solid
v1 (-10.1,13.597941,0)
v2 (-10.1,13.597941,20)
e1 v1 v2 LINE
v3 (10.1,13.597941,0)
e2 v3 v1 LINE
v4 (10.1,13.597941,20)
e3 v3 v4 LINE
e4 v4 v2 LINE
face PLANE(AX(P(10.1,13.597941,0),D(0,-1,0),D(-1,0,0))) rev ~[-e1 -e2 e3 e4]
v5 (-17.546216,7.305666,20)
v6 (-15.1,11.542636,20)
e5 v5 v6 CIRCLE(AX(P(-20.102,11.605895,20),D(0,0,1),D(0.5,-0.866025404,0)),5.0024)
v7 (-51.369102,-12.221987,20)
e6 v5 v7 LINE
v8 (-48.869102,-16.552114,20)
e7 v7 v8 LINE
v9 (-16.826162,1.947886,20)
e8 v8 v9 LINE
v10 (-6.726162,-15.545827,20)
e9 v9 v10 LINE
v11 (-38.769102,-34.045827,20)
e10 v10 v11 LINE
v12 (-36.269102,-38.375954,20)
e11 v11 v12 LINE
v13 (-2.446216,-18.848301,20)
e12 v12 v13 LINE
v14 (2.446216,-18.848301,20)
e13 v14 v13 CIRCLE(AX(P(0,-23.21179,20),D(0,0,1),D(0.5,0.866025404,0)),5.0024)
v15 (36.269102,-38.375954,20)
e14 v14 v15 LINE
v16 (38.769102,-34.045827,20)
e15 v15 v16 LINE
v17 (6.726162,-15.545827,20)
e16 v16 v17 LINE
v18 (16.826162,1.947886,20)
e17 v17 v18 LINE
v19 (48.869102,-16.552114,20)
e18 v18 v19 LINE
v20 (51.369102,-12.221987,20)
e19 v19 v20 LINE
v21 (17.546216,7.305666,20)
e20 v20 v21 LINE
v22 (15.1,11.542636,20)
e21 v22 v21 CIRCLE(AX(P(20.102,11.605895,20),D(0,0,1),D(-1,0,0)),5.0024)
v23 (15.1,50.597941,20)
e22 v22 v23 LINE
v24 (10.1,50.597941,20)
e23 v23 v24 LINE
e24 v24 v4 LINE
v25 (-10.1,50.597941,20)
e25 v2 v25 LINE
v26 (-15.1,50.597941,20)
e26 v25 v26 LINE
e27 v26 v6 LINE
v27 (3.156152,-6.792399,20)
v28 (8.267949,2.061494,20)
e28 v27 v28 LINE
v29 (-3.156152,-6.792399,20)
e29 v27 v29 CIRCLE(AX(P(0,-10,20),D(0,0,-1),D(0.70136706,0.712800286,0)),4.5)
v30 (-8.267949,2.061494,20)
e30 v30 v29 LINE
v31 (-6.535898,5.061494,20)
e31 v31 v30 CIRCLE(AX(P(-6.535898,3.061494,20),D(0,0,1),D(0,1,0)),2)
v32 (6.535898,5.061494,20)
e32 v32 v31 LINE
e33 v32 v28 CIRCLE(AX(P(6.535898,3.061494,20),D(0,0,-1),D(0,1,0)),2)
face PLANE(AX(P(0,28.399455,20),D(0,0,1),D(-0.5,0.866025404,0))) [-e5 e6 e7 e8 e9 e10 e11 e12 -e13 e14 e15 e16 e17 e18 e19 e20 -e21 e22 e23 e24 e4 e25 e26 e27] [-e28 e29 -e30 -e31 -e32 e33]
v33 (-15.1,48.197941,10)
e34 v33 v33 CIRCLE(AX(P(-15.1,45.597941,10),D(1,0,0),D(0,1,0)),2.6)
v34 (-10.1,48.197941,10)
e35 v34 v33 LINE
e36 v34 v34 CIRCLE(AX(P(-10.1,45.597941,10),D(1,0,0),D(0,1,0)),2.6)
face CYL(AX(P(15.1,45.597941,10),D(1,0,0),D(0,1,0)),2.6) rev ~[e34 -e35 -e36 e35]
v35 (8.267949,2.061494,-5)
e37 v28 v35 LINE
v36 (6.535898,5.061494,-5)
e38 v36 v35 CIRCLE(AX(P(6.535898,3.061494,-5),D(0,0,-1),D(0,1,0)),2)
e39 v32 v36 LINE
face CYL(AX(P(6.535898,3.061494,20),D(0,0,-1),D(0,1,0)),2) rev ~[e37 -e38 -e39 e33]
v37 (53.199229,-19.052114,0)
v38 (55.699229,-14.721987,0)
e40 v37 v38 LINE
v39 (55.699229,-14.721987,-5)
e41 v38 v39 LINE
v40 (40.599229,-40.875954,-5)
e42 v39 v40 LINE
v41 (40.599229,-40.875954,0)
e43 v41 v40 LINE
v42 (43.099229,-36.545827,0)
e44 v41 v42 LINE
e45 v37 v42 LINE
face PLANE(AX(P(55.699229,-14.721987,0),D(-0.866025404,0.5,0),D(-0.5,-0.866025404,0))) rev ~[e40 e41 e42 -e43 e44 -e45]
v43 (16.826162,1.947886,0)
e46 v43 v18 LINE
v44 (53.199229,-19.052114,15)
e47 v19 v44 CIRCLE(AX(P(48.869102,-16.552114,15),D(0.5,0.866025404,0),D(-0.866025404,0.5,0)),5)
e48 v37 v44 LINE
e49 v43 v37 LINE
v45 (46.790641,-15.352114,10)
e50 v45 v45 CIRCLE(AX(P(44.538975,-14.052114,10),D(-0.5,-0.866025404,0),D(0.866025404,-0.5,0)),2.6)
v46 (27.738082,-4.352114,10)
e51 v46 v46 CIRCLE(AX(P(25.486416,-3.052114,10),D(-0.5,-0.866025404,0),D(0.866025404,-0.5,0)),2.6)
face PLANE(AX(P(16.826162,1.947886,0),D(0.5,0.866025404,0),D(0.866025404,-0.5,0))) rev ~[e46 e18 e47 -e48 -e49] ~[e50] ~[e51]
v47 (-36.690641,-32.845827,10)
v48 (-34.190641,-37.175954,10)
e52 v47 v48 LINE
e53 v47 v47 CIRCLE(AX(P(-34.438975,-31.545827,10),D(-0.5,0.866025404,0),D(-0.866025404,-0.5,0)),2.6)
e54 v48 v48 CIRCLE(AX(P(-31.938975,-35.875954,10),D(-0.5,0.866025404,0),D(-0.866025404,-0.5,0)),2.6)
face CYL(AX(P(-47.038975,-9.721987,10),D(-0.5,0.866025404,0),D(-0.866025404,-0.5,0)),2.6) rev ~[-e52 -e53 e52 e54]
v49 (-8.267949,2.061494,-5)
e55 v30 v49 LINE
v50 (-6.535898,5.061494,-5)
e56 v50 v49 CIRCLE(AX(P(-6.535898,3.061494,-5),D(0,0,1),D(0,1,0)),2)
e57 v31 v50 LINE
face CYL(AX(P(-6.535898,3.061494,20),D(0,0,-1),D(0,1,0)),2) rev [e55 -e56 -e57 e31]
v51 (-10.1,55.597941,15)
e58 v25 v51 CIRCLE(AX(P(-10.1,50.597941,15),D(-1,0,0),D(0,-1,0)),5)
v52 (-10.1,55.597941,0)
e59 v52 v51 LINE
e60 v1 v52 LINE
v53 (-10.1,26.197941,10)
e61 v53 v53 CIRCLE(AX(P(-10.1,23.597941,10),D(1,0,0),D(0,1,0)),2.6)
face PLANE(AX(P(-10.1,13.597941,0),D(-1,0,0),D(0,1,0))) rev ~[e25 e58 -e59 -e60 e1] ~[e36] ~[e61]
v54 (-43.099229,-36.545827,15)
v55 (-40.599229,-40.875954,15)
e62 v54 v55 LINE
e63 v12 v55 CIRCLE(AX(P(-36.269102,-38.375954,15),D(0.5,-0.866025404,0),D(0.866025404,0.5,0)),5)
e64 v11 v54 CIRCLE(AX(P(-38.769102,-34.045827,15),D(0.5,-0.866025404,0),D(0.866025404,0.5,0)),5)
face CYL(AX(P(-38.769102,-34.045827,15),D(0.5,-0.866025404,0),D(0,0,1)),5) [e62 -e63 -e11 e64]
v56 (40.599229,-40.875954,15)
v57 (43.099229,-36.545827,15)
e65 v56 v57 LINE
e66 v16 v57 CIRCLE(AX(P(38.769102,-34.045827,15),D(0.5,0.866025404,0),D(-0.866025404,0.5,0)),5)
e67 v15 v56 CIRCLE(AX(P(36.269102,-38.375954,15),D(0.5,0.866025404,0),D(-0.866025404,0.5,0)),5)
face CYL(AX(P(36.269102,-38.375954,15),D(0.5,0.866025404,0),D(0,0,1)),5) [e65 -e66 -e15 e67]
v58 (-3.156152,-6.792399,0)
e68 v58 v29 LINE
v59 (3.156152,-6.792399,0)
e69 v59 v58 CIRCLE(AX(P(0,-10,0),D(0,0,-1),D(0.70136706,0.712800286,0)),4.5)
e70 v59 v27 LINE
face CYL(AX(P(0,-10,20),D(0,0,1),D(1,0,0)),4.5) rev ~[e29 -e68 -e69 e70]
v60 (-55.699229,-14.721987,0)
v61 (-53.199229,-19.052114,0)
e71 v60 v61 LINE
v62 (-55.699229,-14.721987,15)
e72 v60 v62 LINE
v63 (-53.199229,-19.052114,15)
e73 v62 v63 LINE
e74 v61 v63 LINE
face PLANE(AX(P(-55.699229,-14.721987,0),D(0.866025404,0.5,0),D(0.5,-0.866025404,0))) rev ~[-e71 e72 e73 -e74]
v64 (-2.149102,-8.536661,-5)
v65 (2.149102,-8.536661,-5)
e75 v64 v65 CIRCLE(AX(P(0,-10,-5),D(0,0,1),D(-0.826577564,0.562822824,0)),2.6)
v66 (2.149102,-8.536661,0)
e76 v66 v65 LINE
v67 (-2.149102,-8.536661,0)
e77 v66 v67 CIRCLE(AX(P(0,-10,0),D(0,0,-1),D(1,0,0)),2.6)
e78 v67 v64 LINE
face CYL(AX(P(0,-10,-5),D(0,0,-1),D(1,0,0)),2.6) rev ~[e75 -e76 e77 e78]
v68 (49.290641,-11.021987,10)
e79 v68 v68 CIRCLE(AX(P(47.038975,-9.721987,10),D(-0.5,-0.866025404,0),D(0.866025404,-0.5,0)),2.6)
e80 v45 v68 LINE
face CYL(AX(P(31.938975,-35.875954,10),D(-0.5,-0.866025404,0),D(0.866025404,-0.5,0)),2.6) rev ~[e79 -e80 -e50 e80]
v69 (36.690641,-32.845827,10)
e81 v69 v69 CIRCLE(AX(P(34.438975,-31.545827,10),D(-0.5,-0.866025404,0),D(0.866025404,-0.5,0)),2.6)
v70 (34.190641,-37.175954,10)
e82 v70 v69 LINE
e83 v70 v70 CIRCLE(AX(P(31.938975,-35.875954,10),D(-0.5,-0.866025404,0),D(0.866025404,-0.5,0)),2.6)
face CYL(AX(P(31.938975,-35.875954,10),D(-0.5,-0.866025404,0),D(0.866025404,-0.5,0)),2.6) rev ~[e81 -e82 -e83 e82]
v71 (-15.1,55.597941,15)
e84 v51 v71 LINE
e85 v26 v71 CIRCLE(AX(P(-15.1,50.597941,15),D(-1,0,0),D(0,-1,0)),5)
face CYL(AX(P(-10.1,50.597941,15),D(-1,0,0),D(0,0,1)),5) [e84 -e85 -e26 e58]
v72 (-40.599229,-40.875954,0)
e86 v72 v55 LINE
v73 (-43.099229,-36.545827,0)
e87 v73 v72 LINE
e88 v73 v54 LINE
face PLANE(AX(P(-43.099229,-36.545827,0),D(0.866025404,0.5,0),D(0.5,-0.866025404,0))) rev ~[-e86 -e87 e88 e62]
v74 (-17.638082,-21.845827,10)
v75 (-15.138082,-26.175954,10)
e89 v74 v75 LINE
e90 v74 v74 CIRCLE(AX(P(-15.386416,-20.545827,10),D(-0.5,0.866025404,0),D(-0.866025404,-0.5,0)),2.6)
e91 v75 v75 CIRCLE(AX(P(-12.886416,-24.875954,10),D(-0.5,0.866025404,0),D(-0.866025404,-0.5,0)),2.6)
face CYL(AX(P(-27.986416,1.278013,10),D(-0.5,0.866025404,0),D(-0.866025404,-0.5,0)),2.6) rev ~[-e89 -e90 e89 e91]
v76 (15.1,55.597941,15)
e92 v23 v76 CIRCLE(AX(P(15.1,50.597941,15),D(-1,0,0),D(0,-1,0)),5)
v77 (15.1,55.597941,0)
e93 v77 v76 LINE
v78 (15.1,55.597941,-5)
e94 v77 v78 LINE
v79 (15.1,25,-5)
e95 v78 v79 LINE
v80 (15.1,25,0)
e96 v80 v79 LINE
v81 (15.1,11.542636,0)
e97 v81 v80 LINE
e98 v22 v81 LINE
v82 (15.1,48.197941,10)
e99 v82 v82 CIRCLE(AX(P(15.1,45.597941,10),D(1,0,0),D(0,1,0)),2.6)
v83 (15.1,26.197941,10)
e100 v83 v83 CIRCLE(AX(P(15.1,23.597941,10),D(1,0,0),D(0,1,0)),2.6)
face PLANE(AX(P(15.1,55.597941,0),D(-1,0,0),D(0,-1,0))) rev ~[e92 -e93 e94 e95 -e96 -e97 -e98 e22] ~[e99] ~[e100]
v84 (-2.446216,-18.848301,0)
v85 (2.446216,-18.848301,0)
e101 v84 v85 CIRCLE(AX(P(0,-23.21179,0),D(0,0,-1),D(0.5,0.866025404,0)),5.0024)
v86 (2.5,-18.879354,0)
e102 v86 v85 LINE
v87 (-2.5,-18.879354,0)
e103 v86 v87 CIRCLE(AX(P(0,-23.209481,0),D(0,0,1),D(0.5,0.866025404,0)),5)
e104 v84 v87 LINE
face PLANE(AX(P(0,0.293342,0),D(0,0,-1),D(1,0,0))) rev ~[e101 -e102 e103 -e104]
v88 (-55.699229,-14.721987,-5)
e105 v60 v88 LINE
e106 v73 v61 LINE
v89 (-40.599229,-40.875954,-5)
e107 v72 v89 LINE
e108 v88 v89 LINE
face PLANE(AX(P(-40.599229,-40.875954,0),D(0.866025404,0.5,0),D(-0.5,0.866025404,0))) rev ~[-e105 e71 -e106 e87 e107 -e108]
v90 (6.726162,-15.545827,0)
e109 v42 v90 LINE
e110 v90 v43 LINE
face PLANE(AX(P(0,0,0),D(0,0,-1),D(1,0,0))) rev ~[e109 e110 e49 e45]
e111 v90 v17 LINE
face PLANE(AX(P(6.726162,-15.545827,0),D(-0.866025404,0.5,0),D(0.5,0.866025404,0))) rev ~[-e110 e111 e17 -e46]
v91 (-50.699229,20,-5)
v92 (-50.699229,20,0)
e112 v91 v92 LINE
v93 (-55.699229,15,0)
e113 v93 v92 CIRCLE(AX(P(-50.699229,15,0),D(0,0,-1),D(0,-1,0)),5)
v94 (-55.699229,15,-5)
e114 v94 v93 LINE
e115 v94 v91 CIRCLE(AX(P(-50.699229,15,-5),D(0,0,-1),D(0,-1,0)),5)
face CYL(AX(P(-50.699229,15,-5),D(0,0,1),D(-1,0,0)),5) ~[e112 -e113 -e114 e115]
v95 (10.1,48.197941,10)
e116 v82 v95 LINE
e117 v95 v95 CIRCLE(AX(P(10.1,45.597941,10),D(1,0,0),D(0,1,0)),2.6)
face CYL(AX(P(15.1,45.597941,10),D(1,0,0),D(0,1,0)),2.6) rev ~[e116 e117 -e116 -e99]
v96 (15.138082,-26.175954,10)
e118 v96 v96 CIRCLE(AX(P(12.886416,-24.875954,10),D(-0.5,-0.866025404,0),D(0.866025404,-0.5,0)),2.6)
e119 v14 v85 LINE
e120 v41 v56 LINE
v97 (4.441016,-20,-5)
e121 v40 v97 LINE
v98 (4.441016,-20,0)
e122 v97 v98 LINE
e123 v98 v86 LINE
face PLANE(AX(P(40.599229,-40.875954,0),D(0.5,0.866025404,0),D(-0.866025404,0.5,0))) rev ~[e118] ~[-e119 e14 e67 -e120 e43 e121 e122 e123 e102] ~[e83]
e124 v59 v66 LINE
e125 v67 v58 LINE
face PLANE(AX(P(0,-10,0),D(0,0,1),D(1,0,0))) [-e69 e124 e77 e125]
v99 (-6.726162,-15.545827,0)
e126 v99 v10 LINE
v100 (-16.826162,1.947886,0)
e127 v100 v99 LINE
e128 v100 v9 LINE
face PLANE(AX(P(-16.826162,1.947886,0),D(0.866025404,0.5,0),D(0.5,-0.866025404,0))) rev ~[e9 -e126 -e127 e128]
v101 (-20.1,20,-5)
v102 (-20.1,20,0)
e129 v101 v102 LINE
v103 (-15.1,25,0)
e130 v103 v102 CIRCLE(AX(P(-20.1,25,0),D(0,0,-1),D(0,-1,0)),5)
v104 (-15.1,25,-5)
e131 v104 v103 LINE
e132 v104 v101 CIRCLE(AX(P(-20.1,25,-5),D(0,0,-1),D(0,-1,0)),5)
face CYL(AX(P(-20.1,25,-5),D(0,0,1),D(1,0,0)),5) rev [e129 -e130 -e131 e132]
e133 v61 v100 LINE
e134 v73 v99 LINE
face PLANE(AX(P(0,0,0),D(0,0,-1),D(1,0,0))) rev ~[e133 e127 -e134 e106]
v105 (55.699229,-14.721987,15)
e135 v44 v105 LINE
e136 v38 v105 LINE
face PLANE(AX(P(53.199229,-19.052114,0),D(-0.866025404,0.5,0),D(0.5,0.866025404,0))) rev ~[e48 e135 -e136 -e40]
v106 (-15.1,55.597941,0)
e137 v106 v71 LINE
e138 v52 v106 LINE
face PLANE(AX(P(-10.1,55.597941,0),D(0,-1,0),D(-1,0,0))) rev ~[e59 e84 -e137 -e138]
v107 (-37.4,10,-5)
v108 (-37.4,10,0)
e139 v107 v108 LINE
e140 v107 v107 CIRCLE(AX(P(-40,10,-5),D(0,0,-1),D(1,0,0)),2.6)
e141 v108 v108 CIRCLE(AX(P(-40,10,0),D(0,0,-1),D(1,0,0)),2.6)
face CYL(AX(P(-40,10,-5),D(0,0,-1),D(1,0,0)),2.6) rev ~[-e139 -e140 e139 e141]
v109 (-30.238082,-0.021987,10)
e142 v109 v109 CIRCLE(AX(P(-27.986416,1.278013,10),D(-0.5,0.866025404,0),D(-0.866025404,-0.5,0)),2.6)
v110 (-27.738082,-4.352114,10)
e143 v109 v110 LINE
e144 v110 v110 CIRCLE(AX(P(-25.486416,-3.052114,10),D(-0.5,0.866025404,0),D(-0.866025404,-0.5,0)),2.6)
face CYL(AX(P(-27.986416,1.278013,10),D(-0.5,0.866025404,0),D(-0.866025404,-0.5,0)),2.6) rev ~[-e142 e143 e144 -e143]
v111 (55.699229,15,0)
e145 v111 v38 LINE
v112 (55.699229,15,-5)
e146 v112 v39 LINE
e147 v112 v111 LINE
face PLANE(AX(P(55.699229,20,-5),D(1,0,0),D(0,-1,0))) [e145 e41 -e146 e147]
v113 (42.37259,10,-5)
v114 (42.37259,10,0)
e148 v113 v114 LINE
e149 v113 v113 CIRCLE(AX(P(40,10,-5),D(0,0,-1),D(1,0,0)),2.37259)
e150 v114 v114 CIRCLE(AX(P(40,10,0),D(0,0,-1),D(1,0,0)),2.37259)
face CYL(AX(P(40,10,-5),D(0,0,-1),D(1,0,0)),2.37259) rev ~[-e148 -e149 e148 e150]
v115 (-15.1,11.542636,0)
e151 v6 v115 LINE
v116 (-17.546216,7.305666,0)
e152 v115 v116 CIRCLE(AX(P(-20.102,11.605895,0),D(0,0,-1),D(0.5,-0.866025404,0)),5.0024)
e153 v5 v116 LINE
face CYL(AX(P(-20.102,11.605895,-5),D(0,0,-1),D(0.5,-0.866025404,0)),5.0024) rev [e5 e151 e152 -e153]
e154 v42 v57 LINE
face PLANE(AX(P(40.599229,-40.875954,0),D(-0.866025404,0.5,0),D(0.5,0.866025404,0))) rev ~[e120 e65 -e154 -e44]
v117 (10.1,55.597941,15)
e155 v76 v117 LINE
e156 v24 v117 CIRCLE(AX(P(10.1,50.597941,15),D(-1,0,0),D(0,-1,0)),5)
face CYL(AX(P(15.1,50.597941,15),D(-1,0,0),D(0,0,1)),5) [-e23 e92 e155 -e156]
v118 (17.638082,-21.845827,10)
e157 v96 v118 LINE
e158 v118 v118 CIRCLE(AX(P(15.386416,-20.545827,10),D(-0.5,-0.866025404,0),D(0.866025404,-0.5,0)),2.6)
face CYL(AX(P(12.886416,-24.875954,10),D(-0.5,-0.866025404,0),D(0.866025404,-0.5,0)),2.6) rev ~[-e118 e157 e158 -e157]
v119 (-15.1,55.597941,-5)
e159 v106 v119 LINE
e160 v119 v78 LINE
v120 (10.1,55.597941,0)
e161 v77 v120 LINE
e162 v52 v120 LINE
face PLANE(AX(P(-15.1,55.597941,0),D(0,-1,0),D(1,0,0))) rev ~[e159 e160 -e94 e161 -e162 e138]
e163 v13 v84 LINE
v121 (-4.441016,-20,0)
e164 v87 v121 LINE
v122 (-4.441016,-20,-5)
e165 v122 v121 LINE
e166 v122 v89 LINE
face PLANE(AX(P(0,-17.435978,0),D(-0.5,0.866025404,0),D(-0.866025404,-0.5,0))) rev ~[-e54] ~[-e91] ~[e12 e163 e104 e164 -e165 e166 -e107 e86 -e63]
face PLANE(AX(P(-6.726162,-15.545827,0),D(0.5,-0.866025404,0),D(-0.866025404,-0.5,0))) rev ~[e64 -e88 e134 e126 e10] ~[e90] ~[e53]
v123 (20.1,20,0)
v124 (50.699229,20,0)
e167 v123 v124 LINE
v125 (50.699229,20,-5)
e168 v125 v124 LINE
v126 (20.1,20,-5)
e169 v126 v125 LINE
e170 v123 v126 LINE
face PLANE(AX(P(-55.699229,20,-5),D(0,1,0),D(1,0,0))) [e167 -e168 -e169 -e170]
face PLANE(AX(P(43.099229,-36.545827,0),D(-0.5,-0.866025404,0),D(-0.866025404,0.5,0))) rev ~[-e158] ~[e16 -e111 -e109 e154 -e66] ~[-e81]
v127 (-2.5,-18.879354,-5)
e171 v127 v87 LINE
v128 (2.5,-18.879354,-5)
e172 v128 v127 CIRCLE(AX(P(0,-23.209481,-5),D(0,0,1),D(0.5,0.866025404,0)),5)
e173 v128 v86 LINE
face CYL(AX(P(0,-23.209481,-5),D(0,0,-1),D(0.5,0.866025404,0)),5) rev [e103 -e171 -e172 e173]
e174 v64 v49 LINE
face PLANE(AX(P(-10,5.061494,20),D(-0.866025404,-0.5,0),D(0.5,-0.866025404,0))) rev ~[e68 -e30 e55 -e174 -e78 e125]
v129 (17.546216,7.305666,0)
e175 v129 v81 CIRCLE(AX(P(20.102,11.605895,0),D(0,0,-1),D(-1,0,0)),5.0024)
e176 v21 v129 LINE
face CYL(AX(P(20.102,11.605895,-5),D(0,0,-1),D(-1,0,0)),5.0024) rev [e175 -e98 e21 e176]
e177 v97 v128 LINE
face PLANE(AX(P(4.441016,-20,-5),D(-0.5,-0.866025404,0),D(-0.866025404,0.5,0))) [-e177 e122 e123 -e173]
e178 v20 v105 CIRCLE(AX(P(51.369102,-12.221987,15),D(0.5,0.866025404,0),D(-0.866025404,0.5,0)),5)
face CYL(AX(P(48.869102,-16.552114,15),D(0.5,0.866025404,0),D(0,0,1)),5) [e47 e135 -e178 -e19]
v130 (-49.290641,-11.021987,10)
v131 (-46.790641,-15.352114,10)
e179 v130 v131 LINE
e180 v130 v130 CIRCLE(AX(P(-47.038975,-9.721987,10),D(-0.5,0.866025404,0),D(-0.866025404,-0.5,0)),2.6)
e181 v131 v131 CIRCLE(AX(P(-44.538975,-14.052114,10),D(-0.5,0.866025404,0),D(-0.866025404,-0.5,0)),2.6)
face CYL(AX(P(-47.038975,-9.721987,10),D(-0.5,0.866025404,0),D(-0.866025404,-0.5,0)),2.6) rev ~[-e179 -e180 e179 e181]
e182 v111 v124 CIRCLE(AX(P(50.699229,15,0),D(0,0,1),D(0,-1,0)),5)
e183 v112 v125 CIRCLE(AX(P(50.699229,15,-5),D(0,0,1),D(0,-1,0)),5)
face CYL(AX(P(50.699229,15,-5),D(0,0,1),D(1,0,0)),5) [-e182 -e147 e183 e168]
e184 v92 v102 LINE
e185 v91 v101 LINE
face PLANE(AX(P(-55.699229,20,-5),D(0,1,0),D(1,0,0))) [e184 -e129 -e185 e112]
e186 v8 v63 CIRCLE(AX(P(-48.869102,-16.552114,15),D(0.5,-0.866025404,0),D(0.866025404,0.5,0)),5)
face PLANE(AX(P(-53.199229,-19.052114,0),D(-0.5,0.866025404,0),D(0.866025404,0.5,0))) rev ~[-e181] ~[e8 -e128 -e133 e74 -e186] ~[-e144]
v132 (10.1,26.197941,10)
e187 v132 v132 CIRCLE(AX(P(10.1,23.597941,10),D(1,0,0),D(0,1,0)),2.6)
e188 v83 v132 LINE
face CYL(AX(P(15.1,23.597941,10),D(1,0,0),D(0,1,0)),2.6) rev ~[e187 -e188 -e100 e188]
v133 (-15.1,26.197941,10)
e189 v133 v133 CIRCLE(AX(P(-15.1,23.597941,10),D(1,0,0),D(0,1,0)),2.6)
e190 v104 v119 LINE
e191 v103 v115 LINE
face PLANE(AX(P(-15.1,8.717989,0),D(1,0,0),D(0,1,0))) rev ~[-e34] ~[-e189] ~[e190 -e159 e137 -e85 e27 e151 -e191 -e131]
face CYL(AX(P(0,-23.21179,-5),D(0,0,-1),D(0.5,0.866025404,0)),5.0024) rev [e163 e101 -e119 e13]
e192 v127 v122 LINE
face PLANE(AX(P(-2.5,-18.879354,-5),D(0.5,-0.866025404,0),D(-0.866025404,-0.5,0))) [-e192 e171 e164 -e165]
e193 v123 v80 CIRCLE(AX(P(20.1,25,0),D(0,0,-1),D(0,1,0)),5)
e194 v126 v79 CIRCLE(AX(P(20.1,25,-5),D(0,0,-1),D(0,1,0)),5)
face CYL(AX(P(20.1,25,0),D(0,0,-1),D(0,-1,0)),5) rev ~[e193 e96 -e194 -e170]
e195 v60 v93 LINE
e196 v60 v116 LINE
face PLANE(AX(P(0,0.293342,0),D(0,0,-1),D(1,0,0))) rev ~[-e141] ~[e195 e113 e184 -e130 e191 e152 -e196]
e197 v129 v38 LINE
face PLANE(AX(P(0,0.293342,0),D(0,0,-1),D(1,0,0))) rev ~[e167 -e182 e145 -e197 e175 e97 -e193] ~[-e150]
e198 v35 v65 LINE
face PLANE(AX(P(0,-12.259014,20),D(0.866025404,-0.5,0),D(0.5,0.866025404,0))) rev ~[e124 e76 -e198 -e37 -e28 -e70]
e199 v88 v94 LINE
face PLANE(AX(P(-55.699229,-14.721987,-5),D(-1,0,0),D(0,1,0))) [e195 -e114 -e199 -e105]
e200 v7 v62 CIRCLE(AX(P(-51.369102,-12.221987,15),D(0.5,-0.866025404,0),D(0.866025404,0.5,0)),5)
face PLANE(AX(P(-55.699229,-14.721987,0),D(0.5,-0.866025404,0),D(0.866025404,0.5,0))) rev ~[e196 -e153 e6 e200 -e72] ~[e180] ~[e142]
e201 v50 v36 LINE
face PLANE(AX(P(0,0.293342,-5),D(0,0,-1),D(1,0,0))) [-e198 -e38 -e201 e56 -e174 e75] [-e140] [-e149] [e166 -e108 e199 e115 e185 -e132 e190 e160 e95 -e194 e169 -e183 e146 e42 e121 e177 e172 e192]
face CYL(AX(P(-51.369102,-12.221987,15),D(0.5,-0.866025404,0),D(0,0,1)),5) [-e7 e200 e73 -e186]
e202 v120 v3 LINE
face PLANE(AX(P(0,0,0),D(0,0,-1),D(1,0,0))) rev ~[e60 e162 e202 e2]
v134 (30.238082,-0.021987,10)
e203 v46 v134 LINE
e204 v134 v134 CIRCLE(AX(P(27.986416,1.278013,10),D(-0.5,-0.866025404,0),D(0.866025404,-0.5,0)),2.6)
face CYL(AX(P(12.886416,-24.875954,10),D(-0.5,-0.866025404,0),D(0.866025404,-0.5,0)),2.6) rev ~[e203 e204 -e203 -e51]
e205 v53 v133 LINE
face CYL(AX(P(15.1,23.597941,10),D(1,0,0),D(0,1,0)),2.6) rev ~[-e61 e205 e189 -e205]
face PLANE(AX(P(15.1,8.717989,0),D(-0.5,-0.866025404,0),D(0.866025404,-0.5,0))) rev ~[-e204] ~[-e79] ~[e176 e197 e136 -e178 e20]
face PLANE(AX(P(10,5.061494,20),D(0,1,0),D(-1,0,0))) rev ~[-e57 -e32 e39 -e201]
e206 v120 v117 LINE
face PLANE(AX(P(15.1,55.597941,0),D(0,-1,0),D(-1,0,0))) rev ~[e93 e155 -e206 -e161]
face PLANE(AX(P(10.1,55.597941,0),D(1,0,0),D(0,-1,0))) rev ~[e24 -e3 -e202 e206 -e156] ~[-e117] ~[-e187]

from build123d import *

# Parameters (mm, degrees)
F1_DEPTH    = 20
F2_R        = 2.6
F3_DEPTH    = 50.6016350946
F4_COUNT    = 3
F4_ANGLE    = 240
F6_DEPTH    = 5
F7_T1_DEPTH = 25
F10_DEPTH   = 5
F11_DEPTH   = 25.001
F12_R       = 2
F13_R       = 2.6
F13_R_2     = 2.372590354
F14_DEPTH   = 25.001
F15_R       = 5
F16_R       = 4.5
F17_DEPTH   = 20


# Not quite as in the source:
# - a fillet or chamfer that OpenCascade refuses, or shapes differently, is made with other operations: its cross-section is extruded or revolved along the edge and cut away or added


with BuildPart() as f1:
    # F0 (on Top) → F1 (new body)
    with BuildSketch(Plane.XY):
        Polygon((43.0992290895, -36.5458269543), (6.7261621305, -15.5458269543), (16.8261621305, 1.9478862021), (53.1992290895, -19.0521137979), (55.6992290895, -14.7219867789), (14.8979589003, 8.8346375481), (0, 0), (-0.2020410997, -17.3193296462), (40.5992290895, -40.8759539732), align=None)
    extrude(amount=F1_DEPTH)

    # F2 (on face) → F3 (cut, through all)
    with BuildSketch(Plane(origin=(-7.55, -13.0769835971, 0), x_dir=(0.8660254038, -0.5, 0), z_dir=(-0.5, -0.8660254038, 0))):
        with Locations((45.5979407522, 10)):
            Circle(F2_R)
        with Locations((23.5979407522, 10)):
            Circle(F2_R)
    extrude(amount=-F3_DEPTH, mode=Mode.SUBTRACT)

    # F4: F1 ×3 about axis
    f4_axis = Axis((0, 0, 10), (0, 0, -1))


with BuildPart() as f1_1:
    add(f1.part)
    for i in range(1, F4_COUNT):
        add(f1.part.rotate(f4_axis, i * F4_ANGLE / (F4_COUNT - 1)))

    # F5 (on face) → F6 (join)
    with BuildSketch(Plane(origin=(0, 0, 0), x_dir=(1, 0, 0), z_dir=(0, 0, -1))):
        Polygon((0, 17.4359781295), (-40.5992290895, 40.8759539732), (-55.6992290895, 14.7219867789), (-15.1, -8.7179890648), (-15.1, -55.5979407522), (15.1, -55.5979407522), (15.1, -8.7179890648), (55.6992290895, 14.7219867789), (40.5992290895, 40.8759539732), align=None)
    extrude(amount=F6_DEPTH)

    # F7: fillet of radius 5 on 3 edges, made by hand

    # F7_s2 → F7_t1 (join)
    with BuildSketch(Plane.XY.offset(-5)):
        with BuildLine():
            ThreePointArc((2.5012, -18.8795847426), (0, -18.2093902225), (-2.5012, -18.8795847426))
            Line((-2.5012, -18.8795847426), (-2.75132, -18.4463641946))
            ThreePointArc((-2.75132, -18.4463641946), (-1.50062, -17.7247340932), (-0.25012, -17.0027575815))
            Line((-0.25012, -17.0027575815), (0.25012, -17.0027575815))
            ThreePointArc((0.25012, -17.0027575815), (1.50062, -17.7247340932), (2.75132, -18.4463641946))
            Line((2.75132, -18.4463641946), (2.5012, -18.8795847426))
        make_face()
        with BuildLine():
            ThreePointArc((15.0996, 11.6058951112), (15.7697945201, 9.1046951112), (17.6008, 7.2736896314))
            Line((17.6008, 7.2736896314), (17.35068, 6.8404690834))
            ThreePointArc((17.35068, 6.8404690834), (16.10038, 7.5627920052), (14.84988, 8.2847685168))
            Line((14.84988, 8.2847685168), (14.59976, 8.7179890648))
            ThreePointArc((14.59976, 8.7179890648), (14.59976, 10.161942088), (14.59936, 11.6058951112))
            Line((14.59936, 11.6058951112), (15.0996, 11.6058951112))
        make_face()
        with BuildLine():
            ThreePointArc((-17.6008, 7.2736896314), (-15.7697945201, 9.1046951112), (-15.0996, 11.6058951112))
            Line((-15.0996, 11.6058951112), (-14.59936, 11.6058951112))
            ThreePointArc((-14.59936, 11.6058951112), (-14.59976, 10.161942088), (-14.59976, 8.7179890648))
            Line((-14.59976, 8.7179890648), (-14.84988, 8.2847685168))
            ThreePointArc((-14.84988, 8.2847685168), (-16.10038, 7.5627920052), (-17.35068, 6.8404690834))
            Line((-17.35068, 6.8404690834), (-17.6008, 7.2736896314))
        make_face()
    extrude(amount=F7_T1_DEPTH)

    # F9 (on face) → F10 (join)
    with BuildSketch(Plane(origin=(0, 0, -5), x_dir=(1, 0, 0), z_dir=(0, 0, -1))):
        with BuildLine():
            Line((-55.6992290895, 14.7219867789), (-55.6992290895, -20))
            Line((-55.6992290895, -20), (55.6992290895, -20))
            Line((55.6992290895, -20), (55.6992290895, 14.7219867789))
            Line((55.6992290895, 14.7219867789), (52.6519667355, 20))
            Line((52.6519667355, 20), (4.4410161514, 20))
            Line((4.4410161514, 20), (2.5, 18.8793538025))
            ThreePointArc((2.5, 18.8793538025), (0, 18.2094808214), (-2.5, 18.8793538025))
            Line((-2.5, 18.8793538025), (-4.4410161514, 20))
            Line((-4.4410161514, 20), (-52.6519667355, 20))
            Line((-52.6519667355, 20), (-55.6992290895, 14.7219867789))
        make_face()
    extrude(amount=-F10_DEPTH)

    # F8 (on face) → F11 (cut, through all)
    with BuildSketch(Plane.XY.offset(20)):
        Polygon((10, 5.0614941438), (-10, 5.0614941438), (0, -12.2590139319), align=None)
    extrude(amount=-F11_DEPTH, mode=Mode.SUBTRACT)

    # F12
    f12_edges = [f1_1.edges().sort_by_distance(p)[0] for p in [
        (10, 5.061494, 7.5),
        (-10, 5.061494, 7.5),
        (0, -12.259014, 7.5),
    ]]
    fillet(f12_edges, radius=F12_R)

    # F13 (on face) → F14 (cut, through all)
    with BuildSketch(Plane(origin=(0, 0, -5), x_dir=(1, 0, 0), z_dir=(0, 0, -1))):
        with Locations((-40, -10)):
            Circle(F13_R)
        with Locations((40, -10)):
            Circle(F13_R_2)
        with Locations((0, 10)):
            Circle(F13_R)
    extrude(amount=-F14_DEPTH, mode=Mode.SUBTRACT)

    # F15
    f15_edges = [f1_1.edges().sort_by_distance(p)[0] for p in [
        (-15.1, 20, -2.5),
        (15.1, 20, -2.5),
        (55.699229, 20, -2.5),
        (-55.699229, 20, -2.5),
        (-12.6, 55.597941, 20),
        (12.6, 55.597941, 20),
        (-54.449229, -16.88705, 20),
        (-41.849229, -38.71089, 20),
        (54.449229, -16.88705, 20),
        (41.849229, -38.71089, 20),
    ]]
    fillet(f15_edges, radius=F15_R)

    # F16 (on face) → F17 (cut)
    with BuildSketch(Plane.XY.offset(20)):
        with Locations((0, -10)):
            Circle(F16_R)
    extrude(amount=-F17_DEPTH, mode=Mode.SUBTRACT)


solid = f1_1.part
